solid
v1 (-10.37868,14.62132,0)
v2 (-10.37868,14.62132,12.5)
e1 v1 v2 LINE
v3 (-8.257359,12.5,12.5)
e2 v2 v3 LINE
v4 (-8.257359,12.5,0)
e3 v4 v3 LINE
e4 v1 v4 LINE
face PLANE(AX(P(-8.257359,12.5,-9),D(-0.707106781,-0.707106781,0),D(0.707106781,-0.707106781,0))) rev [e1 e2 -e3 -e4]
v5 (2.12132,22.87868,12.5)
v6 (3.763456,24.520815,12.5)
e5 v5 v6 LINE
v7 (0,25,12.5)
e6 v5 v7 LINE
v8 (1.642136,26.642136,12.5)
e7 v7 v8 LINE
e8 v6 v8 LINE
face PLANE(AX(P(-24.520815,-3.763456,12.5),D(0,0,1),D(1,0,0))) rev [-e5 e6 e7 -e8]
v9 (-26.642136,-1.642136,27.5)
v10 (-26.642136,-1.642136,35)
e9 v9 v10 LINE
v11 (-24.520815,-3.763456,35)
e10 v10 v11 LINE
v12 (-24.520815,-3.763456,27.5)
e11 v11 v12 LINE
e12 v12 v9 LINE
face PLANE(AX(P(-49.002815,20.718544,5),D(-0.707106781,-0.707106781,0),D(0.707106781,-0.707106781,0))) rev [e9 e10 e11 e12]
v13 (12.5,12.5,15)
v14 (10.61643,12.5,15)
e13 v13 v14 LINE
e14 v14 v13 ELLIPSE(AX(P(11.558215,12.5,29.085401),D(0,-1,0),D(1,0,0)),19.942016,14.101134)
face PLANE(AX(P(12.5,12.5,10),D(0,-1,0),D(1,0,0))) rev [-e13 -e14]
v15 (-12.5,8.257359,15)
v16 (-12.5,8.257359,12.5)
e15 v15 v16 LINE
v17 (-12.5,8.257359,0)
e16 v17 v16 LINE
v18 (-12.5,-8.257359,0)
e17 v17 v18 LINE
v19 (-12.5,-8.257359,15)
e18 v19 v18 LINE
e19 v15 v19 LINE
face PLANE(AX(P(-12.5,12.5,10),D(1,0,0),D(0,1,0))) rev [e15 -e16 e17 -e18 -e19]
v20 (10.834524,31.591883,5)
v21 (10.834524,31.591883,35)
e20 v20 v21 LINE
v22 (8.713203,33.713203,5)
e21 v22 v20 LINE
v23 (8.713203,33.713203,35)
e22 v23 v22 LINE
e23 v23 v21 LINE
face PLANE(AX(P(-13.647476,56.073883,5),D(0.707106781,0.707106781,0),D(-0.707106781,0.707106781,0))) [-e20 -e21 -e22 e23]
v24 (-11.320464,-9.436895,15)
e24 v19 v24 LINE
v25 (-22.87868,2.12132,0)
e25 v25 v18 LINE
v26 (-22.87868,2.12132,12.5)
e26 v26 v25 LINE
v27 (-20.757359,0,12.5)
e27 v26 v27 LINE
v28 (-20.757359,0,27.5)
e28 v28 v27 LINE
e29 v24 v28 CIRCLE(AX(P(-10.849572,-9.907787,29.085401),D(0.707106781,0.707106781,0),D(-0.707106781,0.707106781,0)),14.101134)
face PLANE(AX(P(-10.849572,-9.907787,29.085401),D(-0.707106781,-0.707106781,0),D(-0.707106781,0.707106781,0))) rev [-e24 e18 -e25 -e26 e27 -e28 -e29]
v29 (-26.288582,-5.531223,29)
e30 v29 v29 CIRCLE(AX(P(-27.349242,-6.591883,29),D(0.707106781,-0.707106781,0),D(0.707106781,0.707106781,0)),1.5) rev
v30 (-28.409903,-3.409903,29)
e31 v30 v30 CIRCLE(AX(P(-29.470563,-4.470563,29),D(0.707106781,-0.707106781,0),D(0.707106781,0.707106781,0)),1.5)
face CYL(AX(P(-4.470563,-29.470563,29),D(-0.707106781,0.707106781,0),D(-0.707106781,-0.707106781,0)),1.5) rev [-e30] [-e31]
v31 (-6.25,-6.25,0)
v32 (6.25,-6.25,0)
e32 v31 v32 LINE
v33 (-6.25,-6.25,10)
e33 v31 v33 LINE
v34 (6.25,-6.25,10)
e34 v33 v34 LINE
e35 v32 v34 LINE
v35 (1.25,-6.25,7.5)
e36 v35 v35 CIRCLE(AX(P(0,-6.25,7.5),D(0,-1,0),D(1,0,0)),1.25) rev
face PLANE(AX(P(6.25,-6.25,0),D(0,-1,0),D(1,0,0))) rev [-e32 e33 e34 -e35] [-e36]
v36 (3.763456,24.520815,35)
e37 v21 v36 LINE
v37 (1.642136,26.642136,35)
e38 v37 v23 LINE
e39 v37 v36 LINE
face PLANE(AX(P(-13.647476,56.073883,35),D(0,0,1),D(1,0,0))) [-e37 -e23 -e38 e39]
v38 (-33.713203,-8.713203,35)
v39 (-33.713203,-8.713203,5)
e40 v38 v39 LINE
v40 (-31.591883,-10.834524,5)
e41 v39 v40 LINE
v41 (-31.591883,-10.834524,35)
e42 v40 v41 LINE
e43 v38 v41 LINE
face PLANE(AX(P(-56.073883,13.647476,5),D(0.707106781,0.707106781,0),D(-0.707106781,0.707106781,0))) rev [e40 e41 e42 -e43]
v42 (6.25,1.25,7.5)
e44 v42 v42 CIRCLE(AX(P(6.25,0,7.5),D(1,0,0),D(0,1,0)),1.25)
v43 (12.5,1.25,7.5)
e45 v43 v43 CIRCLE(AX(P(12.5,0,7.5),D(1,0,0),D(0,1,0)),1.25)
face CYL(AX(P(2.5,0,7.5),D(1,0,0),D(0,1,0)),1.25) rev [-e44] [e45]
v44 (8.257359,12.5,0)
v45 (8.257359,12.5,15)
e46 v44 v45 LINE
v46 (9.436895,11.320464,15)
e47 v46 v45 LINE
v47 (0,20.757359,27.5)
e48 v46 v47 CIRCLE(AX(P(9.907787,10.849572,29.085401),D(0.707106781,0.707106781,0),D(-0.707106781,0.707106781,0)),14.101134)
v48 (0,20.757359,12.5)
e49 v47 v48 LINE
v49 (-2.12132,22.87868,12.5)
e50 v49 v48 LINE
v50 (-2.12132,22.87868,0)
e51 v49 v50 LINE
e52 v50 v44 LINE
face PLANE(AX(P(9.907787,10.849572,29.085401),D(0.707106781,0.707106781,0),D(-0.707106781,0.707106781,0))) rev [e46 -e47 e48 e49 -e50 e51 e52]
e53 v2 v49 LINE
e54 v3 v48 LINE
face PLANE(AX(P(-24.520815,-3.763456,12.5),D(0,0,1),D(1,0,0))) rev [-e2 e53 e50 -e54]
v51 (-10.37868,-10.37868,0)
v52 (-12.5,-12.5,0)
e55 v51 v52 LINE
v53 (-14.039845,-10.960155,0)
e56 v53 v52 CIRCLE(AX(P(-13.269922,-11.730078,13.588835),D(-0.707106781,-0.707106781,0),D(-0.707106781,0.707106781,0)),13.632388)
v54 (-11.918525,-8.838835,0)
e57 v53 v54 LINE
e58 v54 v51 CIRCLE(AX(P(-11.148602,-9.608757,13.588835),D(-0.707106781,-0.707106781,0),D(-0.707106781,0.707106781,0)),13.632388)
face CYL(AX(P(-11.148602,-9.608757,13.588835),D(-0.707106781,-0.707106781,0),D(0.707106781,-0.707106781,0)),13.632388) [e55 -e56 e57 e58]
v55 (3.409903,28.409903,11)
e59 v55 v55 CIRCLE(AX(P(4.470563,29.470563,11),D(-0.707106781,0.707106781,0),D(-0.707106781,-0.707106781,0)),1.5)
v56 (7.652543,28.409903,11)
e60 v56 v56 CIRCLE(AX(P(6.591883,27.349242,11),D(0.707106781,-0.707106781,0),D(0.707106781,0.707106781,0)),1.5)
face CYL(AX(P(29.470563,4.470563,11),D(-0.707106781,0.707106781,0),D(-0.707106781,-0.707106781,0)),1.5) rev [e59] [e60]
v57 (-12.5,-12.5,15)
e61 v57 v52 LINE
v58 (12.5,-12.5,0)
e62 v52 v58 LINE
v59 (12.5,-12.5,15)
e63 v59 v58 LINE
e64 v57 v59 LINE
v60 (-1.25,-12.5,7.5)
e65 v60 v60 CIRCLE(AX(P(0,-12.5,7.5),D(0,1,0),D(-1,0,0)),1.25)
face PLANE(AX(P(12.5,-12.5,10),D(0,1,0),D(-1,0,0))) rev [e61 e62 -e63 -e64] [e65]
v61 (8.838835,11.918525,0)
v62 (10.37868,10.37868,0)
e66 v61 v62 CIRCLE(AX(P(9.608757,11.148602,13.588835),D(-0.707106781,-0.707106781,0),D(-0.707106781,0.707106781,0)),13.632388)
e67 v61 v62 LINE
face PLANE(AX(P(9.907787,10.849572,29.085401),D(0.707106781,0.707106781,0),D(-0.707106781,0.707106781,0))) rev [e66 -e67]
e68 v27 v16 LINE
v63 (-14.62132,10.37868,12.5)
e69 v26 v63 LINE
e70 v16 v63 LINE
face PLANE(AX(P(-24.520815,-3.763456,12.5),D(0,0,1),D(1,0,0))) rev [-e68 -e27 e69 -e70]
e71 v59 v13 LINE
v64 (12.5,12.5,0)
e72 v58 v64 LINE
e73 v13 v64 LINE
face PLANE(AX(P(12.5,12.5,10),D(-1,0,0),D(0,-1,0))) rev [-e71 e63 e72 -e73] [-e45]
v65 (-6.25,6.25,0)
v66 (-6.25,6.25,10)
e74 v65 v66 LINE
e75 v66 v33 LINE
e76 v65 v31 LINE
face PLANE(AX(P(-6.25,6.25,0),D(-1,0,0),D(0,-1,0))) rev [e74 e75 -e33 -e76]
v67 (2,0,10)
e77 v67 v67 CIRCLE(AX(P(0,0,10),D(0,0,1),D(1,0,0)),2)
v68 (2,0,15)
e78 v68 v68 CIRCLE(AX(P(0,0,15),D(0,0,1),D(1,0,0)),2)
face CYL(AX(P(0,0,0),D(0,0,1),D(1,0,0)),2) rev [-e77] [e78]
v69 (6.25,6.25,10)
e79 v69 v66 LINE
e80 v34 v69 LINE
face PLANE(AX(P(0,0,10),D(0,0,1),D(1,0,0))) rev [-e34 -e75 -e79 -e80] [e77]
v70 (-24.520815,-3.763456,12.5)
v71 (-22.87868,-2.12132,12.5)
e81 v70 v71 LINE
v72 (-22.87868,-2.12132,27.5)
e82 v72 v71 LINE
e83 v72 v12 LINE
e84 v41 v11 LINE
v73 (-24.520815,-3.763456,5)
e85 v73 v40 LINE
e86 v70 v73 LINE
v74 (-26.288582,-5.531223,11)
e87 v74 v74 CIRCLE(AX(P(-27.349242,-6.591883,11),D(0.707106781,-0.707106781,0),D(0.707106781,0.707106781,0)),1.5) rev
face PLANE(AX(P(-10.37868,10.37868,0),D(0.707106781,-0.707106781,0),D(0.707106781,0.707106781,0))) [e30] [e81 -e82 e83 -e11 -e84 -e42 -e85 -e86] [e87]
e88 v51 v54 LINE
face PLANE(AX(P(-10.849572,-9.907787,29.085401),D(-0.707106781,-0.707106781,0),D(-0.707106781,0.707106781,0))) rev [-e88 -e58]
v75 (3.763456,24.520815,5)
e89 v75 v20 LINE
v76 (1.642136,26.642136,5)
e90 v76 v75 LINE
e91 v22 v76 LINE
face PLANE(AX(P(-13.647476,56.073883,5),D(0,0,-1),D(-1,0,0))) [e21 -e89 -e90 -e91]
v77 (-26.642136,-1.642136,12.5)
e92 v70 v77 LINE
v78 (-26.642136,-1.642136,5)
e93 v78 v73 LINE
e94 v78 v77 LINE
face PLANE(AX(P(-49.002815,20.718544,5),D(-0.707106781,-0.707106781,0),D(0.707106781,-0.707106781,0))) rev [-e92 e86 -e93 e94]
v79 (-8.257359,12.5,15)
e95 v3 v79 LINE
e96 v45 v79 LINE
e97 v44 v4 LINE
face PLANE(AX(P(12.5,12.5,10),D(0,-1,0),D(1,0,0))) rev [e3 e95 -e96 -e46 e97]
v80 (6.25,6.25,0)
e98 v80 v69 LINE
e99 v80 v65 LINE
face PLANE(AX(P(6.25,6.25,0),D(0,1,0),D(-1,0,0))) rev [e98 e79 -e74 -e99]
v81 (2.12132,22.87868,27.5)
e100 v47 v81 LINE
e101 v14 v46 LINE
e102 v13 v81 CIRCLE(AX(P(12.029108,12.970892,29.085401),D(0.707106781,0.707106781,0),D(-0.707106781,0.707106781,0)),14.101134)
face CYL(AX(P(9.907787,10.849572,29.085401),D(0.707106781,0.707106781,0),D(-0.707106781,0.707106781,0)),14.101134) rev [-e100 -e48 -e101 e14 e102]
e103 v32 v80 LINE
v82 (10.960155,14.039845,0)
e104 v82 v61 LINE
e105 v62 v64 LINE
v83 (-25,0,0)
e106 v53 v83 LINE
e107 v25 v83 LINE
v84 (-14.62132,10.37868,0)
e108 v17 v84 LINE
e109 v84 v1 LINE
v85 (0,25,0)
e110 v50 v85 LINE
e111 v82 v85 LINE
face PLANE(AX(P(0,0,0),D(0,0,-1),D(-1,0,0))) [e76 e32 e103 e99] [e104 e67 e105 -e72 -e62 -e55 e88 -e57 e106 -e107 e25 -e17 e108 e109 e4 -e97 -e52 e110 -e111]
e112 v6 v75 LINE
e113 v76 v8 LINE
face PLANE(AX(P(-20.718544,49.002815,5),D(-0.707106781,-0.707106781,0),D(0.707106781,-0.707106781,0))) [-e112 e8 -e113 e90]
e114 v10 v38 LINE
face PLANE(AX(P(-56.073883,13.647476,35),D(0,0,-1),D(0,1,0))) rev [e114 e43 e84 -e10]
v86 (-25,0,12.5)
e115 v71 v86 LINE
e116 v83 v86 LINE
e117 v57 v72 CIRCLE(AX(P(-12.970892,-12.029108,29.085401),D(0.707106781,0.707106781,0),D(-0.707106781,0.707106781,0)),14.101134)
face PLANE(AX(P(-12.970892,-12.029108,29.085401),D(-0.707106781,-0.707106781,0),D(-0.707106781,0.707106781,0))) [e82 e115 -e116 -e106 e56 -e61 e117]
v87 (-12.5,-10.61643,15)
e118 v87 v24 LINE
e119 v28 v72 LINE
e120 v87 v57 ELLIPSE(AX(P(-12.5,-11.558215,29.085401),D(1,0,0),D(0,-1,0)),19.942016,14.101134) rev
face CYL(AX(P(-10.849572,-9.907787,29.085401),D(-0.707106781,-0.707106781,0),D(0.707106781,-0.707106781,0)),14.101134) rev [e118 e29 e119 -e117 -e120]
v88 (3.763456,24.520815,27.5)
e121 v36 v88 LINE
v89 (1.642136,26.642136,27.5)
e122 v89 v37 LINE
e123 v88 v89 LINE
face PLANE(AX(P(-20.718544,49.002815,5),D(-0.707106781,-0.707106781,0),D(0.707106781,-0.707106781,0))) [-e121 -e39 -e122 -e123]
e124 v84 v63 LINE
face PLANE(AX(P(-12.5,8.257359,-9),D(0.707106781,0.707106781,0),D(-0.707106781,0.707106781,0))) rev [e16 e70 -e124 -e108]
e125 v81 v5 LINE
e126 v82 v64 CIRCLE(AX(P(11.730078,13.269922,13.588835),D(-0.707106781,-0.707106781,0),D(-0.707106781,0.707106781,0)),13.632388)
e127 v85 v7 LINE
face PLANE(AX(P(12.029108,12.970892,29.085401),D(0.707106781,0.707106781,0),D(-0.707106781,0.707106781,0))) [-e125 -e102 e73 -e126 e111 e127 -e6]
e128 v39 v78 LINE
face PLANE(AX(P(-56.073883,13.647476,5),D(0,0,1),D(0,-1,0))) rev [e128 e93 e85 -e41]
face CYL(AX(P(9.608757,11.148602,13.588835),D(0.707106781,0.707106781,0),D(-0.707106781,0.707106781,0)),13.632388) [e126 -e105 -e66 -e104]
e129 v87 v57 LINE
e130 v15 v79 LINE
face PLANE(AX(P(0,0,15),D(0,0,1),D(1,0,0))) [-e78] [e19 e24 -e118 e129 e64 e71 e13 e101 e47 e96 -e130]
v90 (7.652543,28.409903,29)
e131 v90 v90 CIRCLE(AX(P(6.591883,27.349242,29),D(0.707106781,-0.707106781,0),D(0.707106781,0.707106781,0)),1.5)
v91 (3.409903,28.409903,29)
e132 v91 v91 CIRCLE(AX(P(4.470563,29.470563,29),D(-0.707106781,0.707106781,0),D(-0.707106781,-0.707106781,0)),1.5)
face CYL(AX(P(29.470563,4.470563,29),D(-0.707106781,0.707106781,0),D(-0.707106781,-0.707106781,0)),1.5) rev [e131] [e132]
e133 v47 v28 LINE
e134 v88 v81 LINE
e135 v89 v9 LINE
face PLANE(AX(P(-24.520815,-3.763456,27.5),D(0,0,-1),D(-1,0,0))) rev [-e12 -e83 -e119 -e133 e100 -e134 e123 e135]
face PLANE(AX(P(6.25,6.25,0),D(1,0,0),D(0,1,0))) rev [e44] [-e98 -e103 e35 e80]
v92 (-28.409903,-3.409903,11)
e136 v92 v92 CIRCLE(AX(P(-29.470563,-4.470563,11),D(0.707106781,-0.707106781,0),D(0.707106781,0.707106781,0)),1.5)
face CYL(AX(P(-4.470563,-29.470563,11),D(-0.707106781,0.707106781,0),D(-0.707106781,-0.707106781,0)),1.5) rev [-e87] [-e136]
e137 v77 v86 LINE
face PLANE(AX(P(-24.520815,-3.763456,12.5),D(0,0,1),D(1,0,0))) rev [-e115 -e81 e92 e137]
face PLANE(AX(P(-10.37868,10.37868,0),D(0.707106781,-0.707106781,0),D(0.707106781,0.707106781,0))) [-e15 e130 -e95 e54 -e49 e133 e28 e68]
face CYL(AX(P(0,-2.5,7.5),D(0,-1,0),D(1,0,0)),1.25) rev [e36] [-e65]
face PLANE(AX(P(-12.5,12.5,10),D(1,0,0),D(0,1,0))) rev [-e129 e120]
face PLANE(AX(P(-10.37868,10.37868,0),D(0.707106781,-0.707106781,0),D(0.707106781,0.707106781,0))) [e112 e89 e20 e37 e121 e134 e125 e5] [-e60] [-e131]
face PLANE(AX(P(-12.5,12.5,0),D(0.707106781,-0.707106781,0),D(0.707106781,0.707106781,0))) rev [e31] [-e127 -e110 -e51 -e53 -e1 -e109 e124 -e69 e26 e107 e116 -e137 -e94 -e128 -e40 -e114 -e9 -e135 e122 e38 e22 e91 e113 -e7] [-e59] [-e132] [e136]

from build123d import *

# Parameters (mm, degrees)
SKETCH_1_W          = 25
SKETCH_1_H          = 25
EXTRUDE_1_DEPTH     = 10
SKETCH_2_W          = 12.5
SKETCH_2_H          = 12.5
CUT_EXTRUDE_1_DEPTH = 21.310096012
SKETCH_3_W          = 25
SKETCH_3_H          = 25
EXTRUDE_2_DEPTH     = 5
SKETCH_4_R          = 2
CUT_EXTRUDE_2_DEPTH = 24.184046239
SKETCH_5_W          = 15
SKETCH_5_H          = 40
EXTRUDE_3_DEPTH     = 3
SKETCH_9_W          = 30
SKETCH_9_H          = 10
EXTRUDE_7_DEPTH     = 3
SKETCH_11_R         = 1.5
CUT_EXTRUDE_3_DEPTH = 50.749371855
EXTRUDE_8_DEPTH     = 12.5
EXTRUDE_9_DEPTH     = 3
SKETCH_15_R         = 1.25
CUT_EXTRUDE_4_DEPTH = 10
EXTRUDE_START       = -3
EXTRUDE_10_DEPTH    = 3


# Read off the part's stored shape, not the designer's step: 凸台-拉伸10
with BuildPart() as part:
    # 草图1 → 凸台-拉伸1 (new body)
    with BuildSketch(Plane.XY):
        Rectangle(SKETCH_1_W, SKETCH_1_H)
    extrude(amount=EXTRUDE_1_DEPTH)

    # 草图2 → 切除-拉伸1 (cut, through all)
    with BuildSketch(Plane.XY.offset(10)):
        Rectangle(SKETCH_2_W, SKETCH_2_H)
    extrude(amount=-CUT_EXTRUDE_1_DEPTH, mode=Mode.SUBTRACT)

    # 草图3 → 凸台-拉伸2 (add)
    with BuildSketch(Plane.XY.offset(10)):
        Rectangle(SKETCH_3_W, SKETCH_3_H)
    extrude(amount=EXTRUDE_2_DEPTH)

    # 草图4 → 切除-拉伸2 (cut, through all)
    with BuildSketch(Plane.XY.offset(15)):
        Circle(SKETCH_4_R)
    extrude(amount=-CUT_EXTRUDE_2_DEPTH, mode=Mode.SUBTRACT)

    # 草图5 → 凸台-拉伸3 (add)
    with BuildSketch(Plane(origin=(-12.5, 12.5, 0), x_dir=(0, 0, -1), z_dir=(0.7071067811865477, -0.7071067811865474, 0))):
        with Locations((-20, 0)):
            Rectangle(SKETCH_5_W, SKETCH_5_H)
    extrude(amount=EXTRUDE_3_DEPTH)

    # 草图9 → 凸台-拉伸7 (add)
    with BuildSketch(Plane(origin=(-10.378679656, 10.378679656, 0), x_dir=(0, 0, -1), z_dir=(0.7071067811865477, -0.7071067811865474, 0))):
        with Locations((-20, 25)):
            Rectangle(SKETCH_9_W, SKETCH_9_H)
    extrude_7 = extrude(amount=-EXTRUDE_7_DEPTH)

    # 草图11 → 切除-拉伸3 (cut, through all)
    with BuildSketch(Plane(origin=(-12.5, 12.5, 0), x_dir=(0, 0, 1), z_dir=(-0.7071067811865477, 0.7071067811865474, 0))):
        with Locations(Location((11, 24, 0), (0, 0, 270))):
            Circle(SKETCH_11_R)
        with Locations(Location((29, 24, 0), (0, 0, 270))):
            Circle(SKETCH_11_R)
    cut_extrude_3 = extrude(amount=-CUT_EXTRUDE_3_DEPTH, mode=Mode.SUBTRACT)

    # 草图12 → 凸台-拉伸8 (add)
    with BuildSketch(Plane(origin=(0, 0, 12.5), x_dir=(-1, 0, 0), z_dir=(0, 0, -1))):
        Polygon((8.257359313, 12.5), (12.5, 8.257359313), (14.621320344, 10.378679656), (10.378679656, 14.621320344), align=None)
    extrude(amount=EXTRUDE_8_DEPTH)

    # 草图13 → 凸台-拉伸9 (add)
    with BuildSketch(Plane(origin=(12.5, 12.5, 0), x_dir=(0, 0, -1), z_dir=(-0.7071067811865474, -0.7071067811865477, 0))):
        with BuildLine():
            Line((-27.5, -14.67766953), (-12.5, -14.67766953))
            ThreePointArc((-12.5, -14.67766953), (-3.210155108, -9.92766953), (0, 0))
            Line((0, 0), (-15, 0))
            ThreePointArc((-15, 0), (-18.349852274, -9.808698696), (-27.5, -14.67766953))
        make_face()
    extrude_9 = extrude(amount=EXTRUDE_9_DEPTH)

    # 草图15 → 切除-拉伸4 (cut)
    with BuildSketch(Plane(origin=(12.5, 0, 0), x_dir=(0, 0, -1), z_dir=(1, 0, 0))):
        with Locations(Location((-7.5, 0, 0), (0, 0, 90))):
            Circle(SKETCH_15_R)
    cut_extrude_4 = extrude(amount=-CUT_EXTRUDE_4_DEPTH, mode=Mode.SUBTRACT)

    # 凸台-拉伸10 outline → 凸台-拉伸10 (add)
    with BuildSketch(Plane(origin=(12.5, 12.5, 0), x_dir=(0, 0, -1), z_dir=(0.7071067811865474, 0.7071067811865477, 0)).offset(EXTRUDE_START)):
        with BuildLine():
            ThreePointArc((-12.5, 14.67766953), (-3.949281056, 10.728388475), (0, 2.177669532))
            Line((0, 2.177669532), (0, 17.67766953))
            Line((0, 17.67766953), (-12.5, 17.67766953))
            Line((-12.5, 17.67766953), (-12.5, 14.67766953))
        make_face()
    extrude_10 = extrude(amount=EXTRUDE_10_DEPTH)

    # 镜向3: 凸台-拉伸7, 切除-拉伸3, 凸台-拉伸9, 切除-拉伸4, 凸台-拉伸10 across plane
    add(extrude_7.mirror(Plane(origin=(0, 0, 0), x_dir=(0, 0, 1), z_dir=(-0.7071067811865474, -0.7071067811865477, 0))))
    add(cut_extrude_3.mirror(Plane(origin=(0, 0, 0), x_dir=(0, 0, 1), z_dir=(-0.7071067811865474, -0.7071067811865477, 0))), mode=Mode.SUBTRACT)
    add(extrude_9.mirror(Plane(origin=(0, 0, 0), x_dir=(0, 0, 1), z_dir=(-0.7071067811865474, -0.7071067811865477, 0))))
    add(cut_extrude_4.mirror(Plane(origin=(0, 0, 0), x_dir=(0, 0, 1), z_dir=(-0.7071067811865474, -0.7071067811865477, 0))), mode=Mode.SUBTRACT)
    add(extrude_10.mirror(Plane(origin=(0, 0, 0), x_dir=(0, 0, 1), z_dir=(-0.7071067811865474, -0.7071067811865477, 0))))


solid = part.part
